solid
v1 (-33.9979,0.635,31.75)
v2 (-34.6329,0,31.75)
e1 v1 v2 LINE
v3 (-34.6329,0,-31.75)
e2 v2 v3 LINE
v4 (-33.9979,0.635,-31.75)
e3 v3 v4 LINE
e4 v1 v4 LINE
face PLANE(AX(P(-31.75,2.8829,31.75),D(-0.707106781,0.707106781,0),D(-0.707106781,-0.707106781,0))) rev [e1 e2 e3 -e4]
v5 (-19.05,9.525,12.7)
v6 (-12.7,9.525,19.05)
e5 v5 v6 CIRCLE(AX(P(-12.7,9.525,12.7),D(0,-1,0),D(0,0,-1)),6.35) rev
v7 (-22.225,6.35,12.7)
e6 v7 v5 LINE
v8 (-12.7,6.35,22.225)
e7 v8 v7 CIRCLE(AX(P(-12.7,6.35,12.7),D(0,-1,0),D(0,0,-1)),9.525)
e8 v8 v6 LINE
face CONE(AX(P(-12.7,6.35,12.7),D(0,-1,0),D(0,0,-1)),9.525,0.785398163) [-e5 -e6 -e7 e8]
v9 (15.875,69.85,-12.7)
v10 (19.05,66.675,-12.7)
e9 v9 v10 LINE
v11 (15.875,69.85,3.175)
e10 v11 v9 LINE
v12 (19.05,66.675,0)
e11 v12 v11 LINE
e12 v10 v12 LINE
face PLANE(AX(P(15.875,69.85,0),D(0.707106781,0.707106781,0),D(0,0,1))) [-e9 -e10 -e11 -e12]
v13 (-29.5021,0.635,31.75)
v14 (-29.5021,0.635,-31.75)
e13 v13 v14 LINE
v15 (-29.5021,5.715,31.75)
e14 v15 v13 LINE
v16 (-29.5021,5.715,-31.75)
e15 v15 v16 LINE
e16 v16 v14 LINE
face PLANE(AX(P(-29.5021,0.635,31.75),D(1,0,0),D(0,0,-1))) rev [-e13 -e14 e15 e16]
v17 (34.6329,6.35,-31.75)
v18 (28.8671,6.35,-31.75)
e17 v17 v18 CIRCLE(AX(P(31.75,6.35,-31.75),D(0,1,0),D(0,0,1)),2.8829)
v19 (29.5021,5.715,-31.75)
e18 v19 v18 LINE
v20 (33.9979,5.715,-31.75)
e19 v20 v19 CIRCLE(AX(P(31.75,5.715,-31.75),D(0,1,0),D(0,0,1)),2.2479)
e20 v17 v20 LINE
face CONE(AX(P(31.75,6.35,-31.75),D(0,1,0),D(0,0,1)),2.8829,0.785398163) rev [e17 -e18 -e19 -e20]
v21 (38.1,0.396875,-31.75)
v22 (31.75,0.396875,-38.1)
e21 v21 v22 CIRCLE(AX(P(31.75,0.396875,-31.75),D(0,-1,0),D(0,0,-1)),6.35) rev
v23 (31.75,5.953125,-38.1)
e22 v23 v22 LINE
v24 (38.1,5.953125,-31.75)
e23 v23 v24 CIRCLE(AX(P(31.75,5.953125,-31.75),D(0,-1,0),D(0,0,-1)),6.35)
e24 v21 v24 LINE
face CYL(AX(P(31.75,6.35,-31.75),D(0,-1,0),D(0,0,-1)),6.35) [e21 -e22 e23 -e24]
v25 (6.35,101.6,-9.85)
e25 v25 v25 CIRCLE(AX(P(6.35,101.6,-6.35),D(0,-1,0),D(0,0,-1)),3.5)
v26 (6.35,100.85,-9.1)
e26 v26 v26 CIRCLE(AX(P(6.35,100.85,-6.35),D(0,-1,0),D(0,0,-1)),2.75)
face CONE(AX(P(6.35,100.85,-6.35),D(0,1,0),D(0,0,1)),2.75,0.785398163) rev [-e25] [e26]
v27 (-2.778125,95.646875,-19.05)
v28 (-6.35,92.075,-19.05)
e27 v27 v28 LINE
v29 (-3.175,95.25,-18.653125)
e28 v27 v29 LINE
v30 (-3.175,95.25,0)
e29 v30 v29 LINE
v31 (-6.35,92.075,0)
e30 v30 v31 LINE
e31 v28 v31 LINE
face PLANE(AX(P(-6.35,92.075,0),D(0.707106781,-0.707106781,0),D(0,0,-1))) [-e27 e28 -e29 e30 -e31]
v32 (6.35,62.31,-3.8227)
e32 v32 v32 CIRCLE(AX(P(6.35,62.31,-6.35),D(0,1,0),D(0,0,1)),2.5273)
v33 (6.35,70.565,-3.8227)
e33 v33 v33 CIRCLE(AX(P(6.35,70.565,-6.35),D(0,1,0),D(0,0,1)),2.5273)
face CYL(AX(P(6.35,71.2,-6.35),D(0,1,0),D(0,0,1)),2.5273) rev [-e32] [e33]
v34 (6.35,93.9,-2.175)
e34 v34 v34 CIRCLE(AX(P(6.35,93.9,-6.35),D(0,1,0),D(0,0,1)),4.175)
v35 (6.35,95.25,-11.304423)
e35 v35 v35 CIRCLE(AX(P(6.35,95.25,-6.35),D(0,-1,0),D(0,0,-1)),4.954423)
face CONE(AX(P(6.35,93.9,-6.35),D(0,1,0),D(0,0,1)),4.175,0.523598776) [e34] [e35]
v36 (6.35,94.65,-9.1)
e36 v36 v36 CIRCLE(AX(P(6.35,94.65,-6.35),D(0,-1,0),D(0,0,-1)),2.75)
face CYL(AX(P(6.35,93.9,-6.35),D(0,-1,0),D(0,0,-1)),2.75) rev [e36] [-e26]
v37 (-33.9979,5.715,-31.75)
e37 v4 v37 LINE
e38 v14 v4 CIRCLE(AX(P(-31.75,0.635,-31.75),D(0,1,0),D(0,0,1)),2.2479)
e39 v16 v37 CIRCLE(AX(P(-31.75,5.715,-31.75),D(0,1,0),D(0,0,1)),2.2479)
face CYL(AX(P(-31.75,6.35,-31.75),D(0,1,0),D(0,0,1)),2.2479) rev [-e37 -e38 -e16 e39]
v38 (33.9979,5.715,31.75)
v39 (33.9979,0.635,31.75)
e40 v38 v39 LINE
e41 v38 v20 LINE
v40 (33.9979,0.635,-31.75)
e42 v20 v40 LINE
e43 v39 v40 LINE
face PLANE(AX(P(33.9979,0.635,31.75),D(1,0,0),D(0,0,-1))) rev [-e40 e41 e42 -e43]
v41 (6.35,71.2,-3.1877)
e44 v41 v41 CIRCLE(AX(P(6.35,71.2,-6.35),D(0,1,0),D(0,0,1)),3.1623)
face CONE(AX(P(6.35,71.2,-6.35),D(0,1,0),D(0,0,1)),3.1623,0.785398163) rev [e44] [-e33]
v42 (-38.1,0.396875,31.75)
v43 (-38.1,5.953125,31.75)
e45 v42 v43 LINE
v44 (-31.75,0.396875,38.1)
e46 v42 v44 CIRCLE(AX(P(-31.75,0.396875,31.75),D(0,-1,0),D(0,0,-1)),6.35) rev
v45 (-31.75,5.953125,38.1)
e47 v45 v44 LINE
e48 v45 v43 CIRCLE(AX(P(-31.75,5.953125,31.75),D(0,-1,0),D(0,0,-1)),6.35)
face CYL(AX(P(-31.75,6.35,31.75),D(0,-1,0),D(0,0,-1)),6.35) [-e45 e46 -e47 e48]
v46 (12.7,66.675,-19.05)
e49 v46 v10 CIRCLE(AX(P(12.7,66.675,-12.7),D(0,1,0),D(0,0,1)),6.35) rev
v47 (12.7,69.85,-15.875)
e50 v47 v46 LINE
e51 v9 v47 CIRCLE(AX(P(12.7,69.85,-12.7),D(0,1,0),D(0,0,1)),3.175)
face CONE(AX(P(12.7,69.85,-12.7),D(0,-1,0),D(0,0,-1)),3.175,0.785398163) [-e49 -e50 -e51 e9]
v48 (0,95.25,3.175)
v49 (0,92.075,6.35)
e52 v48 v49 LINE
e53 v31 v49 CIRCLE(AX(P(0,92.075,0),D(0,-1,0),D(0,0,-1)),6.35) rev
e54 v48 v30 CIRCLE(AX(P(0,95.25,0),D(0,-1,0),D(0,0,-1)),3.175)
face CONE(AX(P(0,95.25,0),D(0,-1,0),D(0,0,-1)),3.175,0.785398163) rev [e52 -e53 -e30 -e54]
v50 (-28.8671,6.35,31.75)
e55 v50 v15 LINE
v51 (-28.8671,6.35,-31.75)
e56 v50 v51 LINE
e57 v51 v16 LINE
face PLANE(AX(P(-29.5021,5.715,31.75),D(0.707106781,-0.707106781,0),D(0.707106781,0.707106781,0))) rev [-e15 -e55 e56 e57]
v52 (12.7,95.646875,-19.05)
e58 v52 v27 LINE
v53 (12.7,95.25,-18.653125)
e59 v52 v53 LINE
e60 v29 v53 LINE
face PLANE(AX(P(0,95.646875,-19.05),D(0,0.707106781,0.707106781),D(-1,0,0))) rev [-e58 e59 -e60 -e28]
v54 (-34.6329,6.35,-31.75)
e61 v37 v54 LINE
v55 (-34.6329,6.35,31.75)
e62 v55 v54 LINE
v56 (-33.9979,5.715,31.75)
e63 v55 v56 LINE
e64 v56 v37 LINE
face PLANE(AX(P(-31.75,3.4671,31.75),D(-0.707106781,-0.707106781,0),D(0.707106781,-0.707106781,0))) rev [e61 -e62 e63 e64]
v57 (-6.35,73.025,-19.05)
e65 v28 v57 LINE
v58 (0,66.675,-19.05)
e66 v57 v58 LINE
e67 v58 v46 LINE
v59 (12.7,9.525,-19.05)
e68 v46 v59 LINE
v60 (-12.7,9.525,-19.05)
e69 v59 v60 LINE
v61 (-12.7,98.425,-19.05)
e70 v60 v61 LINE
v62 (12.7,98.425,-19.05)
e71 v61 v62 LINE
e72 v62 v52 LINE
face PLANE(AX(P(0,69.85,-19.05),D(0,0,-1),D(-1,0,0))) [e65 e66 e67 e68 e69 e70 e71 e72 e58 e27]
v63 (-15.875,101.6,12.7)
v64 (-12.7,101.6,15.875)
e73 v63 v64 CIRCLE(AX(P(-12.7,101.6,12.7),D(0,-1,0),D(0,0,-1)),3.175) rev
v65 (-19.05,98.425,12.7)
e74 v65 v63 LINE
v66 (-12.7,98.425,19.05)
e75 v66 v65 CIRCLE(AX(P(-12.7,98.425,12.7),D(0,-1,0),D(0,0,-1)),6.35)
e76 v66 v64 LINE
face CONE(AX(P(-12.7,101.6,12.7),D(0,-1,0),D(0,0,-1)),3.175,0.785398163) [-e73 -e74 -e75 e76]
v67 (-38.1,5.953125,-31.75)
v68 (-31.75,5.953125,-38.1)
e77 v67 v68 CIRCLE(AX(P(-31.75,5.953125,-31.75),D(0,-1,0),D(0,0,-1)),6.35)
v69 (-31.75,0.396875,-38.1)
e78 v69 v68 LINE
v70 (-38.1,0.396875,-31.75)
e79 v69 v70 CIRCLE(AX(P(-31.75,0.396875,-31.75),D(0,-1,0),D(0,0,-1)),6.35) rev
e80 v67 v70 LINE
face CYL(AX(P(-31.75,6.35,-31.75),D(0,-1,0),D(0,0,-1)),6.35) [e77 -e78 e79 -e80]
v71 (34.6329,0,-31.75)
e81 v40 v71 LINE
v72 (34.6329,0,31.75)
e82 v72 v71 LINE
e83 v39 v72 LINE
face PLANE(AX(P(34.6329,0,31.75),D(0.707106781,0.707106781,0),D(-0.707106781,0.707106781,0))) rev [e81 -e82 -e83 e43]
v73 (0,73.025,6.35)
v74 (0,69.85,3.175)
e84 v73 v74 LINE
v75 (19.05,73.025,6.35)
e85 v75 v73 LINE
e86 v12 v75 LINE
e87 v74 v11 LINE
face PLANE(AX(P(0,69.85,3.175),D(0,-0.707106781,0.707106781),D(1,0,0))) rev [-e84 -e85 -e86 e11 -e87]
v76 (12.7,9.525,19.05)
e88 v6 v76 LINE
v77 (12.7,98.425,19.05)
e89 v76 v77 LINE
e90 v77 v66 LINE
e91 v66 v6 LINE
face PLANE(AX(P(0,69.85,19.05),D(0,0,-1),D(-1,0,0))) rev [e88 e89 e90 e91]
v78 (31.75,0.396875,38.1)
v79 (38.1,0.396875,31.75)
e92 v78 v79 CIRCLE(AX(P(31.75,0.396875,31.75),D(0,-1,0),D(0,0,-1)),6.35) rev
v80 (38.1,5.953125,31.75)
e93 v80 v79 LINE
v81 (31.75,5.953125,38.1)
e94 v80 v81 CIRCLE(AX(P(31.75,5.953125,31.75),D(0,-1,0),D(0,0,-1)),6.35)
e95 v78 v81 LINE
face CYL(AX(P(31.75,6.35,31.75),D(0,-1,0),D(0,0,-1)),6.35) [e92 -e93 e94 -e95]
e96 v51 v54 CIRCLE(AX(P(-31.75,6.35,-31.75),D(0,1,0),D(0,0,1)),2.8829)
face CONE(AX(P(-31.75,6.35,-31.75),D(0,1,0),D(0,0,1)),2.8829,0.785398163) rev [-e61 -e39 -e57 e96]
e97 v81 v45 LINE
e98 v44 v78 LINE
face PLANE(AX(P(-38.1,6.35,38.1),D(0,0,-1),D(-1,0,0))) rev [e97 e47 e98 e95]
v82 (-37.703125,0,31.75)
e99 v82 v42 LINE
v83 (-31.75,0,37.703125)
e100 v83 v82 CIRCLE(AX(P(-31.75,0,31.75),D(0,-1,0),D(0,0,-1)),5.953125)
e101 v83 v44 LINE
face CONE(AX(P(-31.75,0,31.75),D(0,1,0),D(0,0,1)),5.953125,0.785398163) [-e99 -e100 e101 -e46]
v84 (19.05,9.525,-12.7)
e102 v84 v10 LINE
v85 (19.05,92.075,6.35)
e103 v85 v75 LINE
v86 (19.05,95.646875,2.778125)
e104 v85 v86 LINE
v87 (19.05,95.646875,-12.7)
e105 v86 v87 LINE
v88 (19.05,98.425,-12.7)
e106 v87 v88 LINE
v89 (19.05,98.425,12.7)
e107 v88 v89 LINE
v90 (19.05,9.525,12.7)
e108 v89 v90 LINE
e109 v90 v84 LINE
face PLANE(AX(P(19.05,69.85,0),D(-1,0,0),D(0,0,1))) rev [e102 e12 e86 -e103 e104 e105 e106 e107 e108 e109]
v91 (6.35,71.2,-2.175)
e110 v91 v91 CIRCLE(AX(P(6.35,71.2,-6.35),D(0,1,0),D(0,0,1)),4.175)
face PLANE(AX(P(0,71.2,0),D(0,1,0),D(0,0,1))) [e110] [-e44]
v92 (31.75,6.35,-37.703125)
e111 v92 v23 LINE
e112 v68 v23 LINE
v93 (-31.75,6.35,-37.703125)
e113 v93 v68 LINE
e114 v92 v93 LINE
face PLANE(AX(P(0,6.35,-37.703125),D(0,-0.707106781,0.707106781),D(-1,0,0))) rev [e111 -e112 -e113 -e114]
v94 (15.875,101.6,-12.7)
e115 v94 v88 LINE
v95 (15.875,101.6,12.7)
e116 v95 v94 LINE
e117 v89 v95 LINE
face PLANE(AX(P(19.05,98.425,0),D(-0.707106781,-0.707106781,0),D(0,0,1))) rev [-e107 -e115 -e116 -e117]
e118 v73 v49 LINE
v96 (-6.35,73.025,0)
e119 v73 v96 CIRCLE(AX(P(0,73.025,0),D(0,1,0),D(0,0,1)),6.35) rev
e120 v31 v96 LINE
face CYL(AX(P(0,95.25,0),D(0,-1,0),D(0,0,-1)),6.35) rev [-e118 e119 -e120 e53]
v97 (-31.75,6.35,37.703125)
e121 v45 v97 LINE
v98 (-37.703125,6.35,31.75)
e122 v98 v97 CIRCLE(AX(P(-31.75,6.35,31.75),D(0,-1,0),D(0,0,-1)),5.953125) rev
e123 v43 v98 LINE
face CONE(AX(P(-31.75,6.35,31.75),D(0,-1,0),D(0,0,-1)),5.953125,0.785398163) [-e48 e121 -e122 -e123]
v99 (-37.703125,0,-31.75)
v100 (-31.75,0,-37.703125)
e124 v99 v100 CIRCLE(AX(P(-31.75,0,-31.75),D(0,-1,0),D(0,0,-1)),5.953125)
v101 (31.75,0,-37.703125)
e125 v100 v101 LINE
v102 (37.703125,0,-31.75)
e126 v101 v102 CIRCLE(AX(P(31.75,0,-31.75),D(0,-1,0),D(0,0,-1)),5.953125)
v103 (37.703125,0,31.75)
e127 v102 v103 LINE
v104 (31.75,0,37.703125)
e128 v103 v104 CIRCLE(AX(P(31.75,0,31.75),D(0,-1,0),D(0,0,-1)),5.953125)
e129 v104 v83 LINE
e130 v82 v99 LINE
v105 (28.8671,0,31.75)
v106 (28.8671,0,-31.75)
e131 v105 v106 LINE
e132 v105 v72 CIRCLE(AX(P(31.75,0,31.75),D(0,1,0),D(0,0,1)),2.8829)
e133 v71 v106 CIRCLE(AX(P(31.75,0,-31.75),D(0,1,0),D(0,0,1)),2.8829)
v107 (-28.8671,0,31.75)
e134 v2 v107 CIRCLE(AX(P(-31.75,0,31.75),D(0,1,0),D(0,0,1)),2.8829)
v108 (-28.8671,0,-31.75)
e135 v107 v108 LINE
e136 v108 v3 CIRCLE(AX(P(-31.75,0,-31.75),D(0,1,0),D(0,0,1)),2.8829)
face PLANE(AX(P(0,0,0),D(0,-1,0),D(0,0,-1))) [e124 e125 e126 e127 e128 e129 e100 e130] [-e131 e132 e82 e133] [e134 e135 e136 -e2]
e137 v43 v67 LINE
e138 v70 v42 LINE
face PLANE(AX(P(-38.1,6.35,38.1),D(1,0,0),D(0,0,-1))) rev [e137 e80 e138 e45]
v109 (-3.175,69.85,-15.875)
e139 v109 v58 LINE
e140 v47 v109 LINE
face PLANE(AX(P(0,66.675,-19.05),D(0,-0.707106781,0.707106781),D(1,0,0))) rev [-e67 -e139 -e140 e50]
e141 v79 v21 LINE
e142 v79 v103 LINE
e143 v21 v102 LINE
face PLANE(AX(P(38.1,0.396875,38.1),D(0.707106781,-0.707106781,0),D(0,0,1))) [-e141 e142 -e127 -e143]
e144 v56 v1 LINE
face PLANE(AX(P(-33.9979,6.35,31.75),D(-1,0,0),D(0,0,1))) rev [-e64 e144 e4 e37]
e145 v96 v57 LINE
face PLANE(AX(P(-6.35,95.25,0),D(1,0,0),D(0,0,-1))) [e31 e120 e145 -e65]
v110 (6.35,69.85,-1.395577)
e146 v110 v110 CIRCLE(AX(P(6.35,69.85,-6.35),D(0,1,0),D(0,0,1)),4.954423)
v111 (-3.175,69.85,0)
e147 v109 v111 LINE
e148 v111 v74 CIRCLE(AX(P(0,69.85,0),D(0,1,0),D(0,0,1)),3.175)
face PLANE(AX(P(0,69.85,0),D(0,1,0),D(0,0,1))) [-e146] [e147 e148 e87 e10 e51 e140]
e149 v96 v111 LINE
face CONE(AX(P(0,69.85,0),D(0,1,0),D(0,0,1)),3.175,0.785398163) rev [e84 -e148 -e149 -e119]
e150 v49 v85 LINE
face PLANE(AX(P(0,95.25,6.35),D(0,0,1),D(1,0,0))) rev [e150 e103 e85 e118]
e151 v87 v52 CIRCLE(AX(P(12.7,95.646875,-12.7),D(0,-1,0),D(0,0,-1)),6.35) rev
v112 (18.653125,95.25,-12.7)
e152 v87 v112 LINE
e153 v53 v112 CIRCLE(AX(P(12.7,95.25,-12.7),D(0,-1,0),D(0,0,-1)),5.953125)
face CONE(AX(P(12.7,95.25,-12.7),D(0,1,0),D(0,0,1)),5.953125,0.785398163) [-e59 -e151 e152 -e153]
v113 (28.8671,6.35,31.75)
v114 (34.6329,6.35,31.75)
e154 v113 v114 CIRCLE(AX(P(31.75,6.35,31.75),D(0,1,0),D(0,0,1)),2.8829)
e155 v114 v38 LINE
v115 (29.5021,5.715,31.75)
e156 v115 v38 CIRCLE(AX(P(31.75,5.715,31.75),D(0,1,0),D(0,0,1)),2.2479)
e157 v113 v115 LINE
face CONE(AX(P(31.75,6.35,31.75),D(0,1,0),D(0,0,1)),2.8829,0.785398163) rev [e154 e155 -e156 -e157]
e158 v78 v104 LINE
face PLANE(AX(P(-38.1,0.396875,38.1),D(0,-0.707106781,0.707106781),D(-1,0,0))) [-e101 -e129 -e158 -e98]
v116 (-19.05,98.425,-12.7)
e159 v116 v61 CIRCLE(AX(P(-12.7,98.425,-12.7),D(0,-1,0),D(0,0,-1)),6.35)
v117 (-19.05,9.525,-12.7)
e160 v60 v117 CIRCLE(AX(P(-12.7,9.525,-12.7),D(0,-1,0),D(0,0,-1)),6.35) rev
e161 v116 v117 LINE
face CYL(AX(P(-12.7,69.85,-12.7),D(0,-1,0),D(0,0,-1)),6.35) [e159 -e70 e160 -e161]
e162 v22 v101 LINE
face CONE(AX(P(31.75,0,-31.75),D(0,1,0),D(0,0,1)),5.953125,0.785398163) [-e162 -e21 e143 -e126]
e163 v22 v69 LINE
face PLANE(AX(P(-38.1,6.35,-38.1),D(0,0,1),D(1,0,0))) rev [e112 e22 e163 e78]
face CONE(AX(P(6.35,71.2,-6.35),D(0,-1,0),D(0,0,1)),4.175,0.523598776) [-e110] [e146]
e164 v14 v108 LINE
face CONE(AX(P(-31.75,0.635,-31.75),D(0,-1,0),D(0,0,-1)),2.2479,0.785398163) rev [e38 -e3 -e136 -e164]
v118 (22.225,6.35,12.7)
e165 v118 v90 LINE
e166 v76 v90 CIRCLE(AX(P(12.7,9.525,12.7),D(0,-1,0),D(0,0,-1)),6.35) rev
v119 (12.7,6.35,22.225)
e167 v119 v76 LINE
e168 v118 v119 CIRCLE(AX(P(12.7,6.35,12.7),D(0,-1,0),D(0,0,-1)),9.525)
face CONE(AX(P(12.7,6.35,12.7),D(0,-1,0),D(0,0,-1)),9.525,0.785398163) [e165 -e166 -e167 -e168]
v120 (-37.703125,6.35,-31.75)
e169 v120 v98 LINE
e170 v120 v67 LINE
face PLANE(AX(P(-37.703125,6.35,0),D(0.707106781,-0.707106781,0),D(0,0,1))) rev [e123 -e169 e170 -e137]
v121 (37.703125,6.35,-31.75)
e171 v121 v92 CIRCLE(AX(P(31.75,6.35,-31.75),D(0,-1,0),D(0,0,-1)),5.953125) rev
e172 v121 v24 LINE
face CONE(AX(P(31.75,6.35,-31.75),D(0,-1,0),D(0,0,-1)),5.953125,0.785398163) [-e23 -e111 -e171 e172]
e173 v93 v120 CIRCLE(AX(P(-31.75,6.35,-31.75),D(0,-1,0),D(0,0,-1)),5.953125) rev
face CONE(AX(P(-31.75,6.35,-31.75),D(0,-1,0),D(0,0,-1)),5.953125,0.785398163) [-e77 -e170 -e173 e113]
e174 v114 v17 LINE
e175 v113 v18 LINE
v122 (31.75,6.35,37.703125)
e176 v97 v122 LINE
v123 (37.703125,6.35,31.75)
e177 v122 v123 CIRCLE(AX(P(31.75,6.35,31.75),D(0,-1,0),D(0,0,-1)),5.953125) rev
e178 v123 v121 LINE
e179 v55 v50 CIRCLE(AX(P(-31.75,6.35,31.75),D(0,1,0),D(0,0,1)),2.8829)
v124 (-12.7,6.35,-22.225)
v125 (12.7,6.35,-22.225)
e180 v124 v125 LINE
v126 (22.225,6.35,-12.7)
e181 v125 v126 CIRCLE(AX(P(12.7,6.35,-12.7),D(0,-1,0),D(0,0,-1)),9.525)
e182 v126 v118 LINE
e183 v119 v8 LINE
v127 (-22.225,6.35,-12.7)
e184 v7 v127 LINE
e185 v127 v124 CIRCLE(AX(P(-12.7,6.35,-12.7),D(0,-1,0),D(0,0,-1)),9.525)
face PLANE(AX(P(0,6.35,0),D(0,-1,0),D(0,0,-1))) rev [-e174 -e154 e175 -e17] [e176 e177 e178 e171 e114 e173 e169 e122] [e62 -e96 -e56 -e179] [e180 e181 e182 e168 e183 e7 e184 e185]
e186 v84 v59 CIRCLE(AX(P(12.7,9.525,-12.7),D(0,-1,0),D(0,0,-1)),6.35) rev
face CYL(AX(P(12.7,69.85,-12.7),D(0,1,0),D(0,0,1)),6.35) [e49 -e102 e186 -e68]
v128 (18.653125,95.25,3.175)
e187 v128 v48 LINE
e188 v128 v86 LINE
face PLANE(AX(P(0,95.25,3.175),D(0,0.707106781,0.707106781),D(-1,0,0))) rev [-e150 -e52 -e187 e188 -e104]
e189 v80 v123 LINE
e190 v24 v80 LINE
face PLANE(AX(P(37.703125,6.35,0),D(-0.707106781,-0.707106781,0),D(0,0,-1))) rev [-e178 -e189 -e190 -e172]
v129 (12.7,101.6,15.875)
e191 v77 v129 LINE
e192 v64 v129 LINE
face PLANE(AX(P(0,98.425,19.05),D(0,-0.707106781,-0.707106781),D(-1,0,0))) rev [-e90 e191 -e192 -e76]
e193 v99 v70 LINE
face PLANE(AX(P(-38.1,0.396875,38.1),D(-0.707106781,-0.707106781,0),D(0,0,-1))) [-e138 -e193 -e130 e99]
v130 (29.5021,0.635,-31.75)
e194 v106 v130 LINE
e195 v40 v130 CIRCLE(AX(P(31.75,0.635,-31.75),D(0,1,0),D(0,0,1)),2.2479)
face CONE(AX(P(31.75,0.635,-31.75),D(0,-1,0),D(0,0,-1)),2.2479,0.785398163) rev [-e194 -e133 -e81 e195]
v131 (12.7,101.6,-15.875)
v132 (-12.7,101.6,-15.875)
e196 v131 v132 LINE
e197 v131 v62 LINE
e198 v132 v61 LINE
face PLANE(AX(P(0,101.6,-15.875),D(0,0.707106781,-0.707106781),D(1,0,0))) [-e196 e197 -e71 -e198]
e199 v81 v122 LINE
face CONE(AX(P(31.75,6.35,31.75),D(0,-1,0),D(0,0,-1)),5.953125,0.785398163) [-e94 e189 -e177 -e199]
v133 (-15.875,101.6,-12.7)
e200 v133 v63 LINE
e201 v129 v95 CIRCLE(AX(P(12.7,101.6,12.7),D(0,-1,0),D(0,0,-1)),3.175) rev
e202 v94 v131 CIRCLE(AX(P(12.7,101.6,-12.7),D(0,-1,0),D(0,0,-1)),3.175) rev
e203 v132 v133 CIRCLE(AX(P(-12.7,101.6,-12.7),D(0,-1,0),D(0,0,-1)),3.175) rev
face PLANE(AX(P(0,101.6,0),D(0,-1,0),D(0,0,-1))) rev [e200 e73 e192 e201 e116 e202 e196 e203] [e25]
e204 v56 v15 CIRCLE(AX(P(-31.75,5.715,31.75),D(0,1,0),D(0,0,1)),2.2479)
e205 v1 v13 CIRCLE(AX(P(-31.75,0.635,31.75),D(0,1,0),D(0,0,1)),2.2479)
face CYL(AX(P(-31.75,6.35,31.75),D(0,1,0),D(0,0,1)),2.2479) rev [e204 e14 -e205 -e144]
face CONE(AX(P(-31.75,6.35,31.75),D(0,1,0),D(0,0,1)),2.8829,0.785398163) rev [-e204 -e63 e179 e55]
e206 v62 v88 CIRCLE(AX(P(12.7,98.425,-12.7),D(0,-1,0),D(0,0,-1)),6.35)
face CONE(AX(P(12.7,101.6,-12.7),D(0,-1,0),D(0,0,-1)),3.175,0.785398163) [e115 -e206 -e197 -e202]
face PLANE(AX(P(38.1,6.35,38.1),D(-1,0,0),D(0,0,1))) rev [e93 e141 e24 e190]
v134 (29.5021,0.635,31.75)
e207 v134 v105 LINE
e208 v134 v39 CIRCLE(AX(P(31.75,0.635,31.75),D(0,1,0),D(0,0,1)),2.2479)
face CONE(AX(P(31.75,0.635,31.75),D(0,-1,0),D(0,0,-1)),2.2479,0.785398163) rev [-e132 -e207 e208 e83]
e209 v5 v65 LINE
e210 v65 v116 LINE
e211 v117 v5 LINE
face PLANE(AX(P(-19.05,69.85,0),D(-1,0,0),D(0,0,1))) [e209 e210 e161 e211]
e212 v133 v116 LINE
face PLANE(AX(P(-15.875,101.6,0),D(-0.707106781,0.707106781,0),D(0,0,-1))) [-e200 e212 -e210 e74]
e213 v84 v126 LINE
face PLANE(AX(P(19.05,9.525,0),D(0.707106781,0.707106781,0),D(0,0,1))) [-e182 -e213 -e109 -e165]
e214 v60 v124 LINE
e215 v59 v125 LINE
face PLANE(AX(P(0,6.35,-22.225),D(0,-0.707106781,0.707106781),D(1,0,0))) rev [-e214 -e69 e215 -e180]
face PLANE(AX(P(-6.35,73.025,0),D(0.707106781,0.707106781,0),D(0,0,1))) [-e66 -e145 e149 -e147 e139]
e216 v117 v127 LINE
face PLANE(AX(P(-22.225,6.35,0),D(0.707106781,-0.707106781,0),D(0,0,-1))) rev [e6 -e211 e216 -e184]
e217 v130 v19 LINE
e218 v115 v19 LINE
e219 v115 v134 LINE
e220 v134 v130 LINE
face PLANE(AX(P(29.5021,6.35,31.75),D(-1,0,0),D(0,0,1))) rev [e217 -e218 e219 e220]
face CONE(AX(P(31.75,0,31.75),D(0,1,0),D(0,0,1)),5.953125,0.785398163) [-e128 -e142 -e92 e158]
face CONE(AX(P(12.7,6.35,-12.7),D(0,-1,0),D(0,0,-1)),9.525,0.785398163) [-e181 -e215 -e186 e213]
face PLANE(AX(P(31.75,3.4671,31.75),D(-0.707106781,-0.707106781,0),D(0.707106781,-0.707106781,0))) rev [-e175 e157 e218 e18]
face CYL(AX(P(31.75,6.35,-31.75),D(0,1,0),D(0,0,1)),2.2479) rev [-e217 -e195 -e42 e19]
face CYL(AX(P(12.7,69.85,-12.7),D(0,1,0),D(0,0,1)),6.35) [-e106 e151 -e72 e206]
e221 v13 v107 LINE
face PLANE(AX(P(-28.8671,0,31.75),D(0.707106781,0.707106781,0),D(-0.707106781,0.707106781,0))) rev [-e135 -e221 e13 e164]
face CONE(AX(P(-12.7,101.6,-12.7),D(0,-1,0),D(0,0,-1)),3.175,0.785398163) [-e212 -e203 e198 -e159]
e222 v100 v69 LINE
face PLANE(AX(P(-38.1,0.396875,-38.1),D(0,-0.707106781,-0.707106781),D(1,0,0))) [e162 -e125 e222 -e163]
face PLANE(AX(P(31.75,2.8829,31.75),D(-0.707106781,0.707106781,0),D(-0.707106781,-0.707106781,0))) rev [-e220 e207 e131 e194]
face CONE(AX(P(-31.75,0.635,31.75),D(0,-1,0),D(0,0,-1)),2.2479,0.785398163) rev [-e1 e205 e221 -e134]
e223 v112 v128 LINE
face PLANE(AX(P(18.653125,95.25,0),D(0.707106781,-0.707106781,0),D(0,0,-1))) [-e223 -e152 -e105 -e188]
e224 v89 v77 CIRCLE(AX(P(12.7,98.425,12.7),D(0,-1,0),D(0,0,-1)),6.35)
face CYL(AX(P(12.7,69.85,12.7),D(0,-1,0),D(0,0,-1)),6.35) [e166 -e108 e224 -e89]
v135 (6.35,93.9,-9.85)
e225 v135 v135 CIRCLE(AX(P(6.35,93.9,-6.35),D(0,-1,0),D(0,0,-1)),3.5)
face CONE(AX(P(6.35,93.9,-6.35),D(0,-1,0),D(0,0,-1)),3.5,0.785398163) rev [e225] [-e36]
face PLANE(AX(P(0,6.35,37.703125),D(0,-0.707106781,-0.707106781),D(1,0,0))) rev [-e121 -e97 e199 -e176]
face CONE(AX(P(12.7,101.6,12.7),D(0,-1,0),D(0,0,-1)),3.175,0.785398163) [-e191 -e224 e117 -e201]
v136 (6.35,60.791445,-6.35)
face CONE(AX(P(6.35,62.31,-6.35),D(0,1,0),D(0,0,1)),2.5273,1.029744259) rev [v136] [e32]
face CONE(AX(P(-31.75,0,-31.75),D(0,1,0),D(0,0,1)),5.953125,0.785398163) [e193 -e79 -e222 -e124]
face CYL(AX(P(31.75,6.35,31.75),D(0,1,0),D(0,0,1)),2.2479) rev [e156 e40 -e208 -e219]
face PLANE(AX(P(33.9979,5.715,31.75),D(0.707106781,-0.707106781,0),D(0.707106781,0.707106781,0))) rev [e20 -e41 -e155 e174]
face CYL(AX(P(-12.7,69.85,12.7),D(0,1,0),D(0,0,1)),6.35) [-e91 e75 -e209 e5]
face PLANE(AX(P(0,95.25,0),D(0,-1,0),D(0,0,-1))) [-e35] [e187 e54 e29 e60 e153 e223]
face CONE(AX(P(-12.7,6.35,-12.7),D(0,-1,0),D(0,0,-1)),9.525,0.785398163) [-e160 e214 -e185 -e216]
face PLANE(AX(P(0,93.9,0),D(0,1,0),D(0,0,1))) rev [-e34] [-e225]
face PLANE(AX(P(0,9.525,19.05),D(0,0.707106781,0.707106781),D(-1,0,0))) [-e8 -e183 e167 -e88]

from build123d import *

# Parameters (mm, degrees)
SKETCH1_W                            = 76.2
SKETCH1_H                            = 76.2
BOSS_EXTRUDE1_DEPTH                  = 6.35
SKETCH2_W                            = 38.1
SKETCH2_H                            = 38.1
BOSS_EXTRUDE2_DEPTH                  = 69.85
BOSS_EXTRUDE3_DEPTH                  = 95.25
BOSS_EXTRUDE4_START                  = 95.25
SKETCH2_5_W                          = 25.4
SKETCH2_5_H                          = 25.4
SKETCH2_5_R                          = 4.175
BOSS_EXTRUDE4_DEPTH                  = 6.35
BOSS_EXTRUDE6_START                  = 93.9
SKETCH2_7_R                          = 4.175
BOSS_EXTRUDE6_DEPTH                  = 1.35
BOSS_EXTRUDE6_DRAFT                  = -30
F_8_0_199_DIAMETER_HOLE1_D           = 5.0546
F_8_0_199_DIAMETER_HOLE1_DEPTH       = 8.89
F_8_0_199_DIAMETER_HOLE1_CSINK_D     = 6.3246
F_8_0_199_DIAMETER_HOLE1_CSINK_ANGLE = 90
F_8_0_199_DIAMETER_HOLE1_TIP         = 1.518555042
F_8_START                            = -31.75
F_8_CLEARANCE_SLOT1_DEPTH            = 63.5
FILLET2_R                            = 6.35
CHAMFER2_SIZE                        = 3.175
CHAMFER3_SIZE                        = 3.175
CHAMFER4_SIZE                        = 0.396875


with BuildPart() as part:
    # Sketch1 → Boss-Extrude1 (new body)
    with BuildSketch(Plane(origin=(0, 0, 0), x_dir=(1, 0, 0), z_dir=(0, 1, 0))):
        Rectangle(SKETCH1_W, SKETCH1_H)
    extrude(amount=BOSS_EXTRUDE1_DEPTH)

    # Sketch2 → Boss-Extrude2 (add)
    with BuildSketch(Plane(origin=(0, 0, 0), x_dir=(1, 0, 0), z_dir=(0, 1, 0))):
        Rectangle(SKETCH2_W, SKETCH2_H)
    extrude(amount=BOSS_EXTRUDE2_DEPTH)

    # Sketch2<3> → Boss-Extrude3 (add)
    with BuildSketch(Plane(origin=(0, 0, 0), x_dir=(1, 0, 0), z_dir=(0, 1, 0))):
        Polygon((-19.05, 19.05), (-19.05, -19.05), (19.05, -19.05), (19.05, -6.35), (-6.35, -6.35), (-6.35, 19.05), align=None)
    extrude(amount=BOSS_EXTRUDE3_DEPTH)

    # Sketch2<5> → Boss-Extrude4 (add)
    # profile 1 of 3: a face of its own
    with BuildSketch(Plane(origin=(0, 0, 0), x_dir=(1, 0, 0), z_dir=(0, 1, 0)).offset(BOSS_EXTRUDE4_START)):
        Polygon((-19.05, 19.05), (-19.05, -19.05), (19.05, -19.05), (19.05, -6.35), (-6.35, -6.35), (-6.35, 19.05), align=None)
    # profile 2 of 3: a face of its own
    with BuildSketch(Plane(origin=(0, 0, 0), x_dir=(1, 0, 0), z_dir=(0, 1, 0)).offset(BOSS_EXTRUDE4_START)):
        with Locations((6.35, 6.35)):
            Rectangle(SKETCH2_5_W, SKETCH2_5_H)
        with Locations((6.35, 6.35)):
            Circle(SKETCH2_5_R, mode=Mode.SUBTRACT)
    # profile 3 of 3: a face of its own
    with BuildSketch(Plane(origin=(0, 0, 0), x_dir=(1, 0, 0), z_dir=(0, 1, 0)).offset(BOSS_EXTRUDE4_START)):
        with Locations((6.35, 6.35)):
            Circle(SKETCH2_5_R)
    extrude(amount=BOSS_EXTRUDE4_DEPTH)

    # Boss-Extrude5: read off the stored shape, not the designer's step
    # Boss-Extrude5 outline → Boss-Extrude5 (revolve)
    with BuildSketch(Plane(origin=(6.35, 0, -6.35), x_dir=(1, 0, 0), z_dir=(0, 0, 1))):
        Polygon((4.175, 71.2), (0, 71.2), (0, 69.85), (4.954422863, 69.85), align=None)
    revolve(axis=Axis((6.35, 0, -6.35), (0, 1, 0)))


with BuildPart() as boss_extrude6_tool:
    # Sketch2<7> → Boss-Extrude6 (with draft: the straight prism first)
    with BuildSketch(Plane(origin=(0, 0, 0), x_dir=(1, 0, 0), z_dir=(0, 1, 0)).offset(BOSS_EXTRUDE6_START)):
        with Locations((6.35, 6.35)):
            Circle(SKETCH2_7_R)
    extrude(amount=BOSS_EXTRUDE6_DEPTH)
    # Boss-Extrude6: the draft: its side faces are tilted about the plane it starts from
    boss_extrude6_sides = [boss_extrude6_tool.faces().sort_by_distance(p)[0] for p in [
        (2.175, 94.575, -6.35),
    ]]
    draft(boss_extrude6_sides, Plane(origin=(0, 0, 0), x_dir=(1, 0, 0), z_dir=(0, 1, 0)).offset(BOSS_EXTRUDE6_START), BOSS_EXTRUDE6_DRAFT)


with BuildPart() as part_1:
    add(part.part)

    # Boss-Extrude6: add boss_extrude6_tool
    add(boss_extrude6_tool.part)

    # #8 (0.199) Diameter Hole1
    with Locations(Plane(origin=(0, 71.2, 0), x_dir=(1, 0, 0), z_dir=(0, 1, 0))):
        with Locations((6.35, 6.35)):
            CounterSinkHole(F_8_0_199_DIAMETER_HOLE1_D / 2, F_8_0_199_DIAMETER_HOLE1_CSINK_D / 2, depth=F_8_0_199_DIAMETER_HOLE1_DEPTH, counter_sink_angle=F_8_0_199_DIAMETER_HOLE1_CSINK_ANGLE)
            with Locations((0, 0, -(F_8_0_199_DIAMETER_HOLE1_DEPTH + F_8_0_199_DIAMETER_HOLE1_TIP / 2))):  # 118° drill point
                Cone(0, F_8_0_199_DIAMETER_HOLE1_D / 2, F_8_0_199_DIAMETER_HOLE1_TIP, mode=Mode.SUBTRACT)

    # Sketch8 → M5 Clearance Hole1 (revolve, cut)
    with BuildSketch(Plane(origin=(6.35, 93.9, -6.35), x_dir=(0, 0, -1), z_dir=(1, 0, 0))):
        Polygon((0, 0), (0, 7.7), (3.5, 7.7), (2.75, 6.95), (2.75, 0.75), (3.5, 0), align=None)
    revolve(axis=Axis((6.35, 87.55, -6.35), (0, 1, 0)), mode=Mode.SUBTRACT)

    # #8 Clearance Slot1: read off the stored shape, not the designer's step
    # #8 Clearance Slot1 outline → #8 Clearance Slot1 (cut)
    with BuildSketch(Plane.XY.offset(F_8_START)):
        Polygon((34.6329, 6.35), (28.8671, 6.35), (29.5021, 5.715), (29.5021, 0.635), (28.8671, 0), (34.6329, 0), (33.9979, 0.635), (33.9979, 5.715), align=None)
        Polygon((-29.5021, 5.715), (-28.8671, 6.35), (-34.6329, 6.35), (-33.9979, 5.715), (-33.9979, 0.635), (-34.6329, 0), (-28.8671, 0), (-29.5021, 0.635), align=None)
    extrude(amount=F_8_CLEARANCE_SLOT1_DEPTH, mode=Mode.SUBTRACT)

    # 8 Clearance Slot1 2 outline → 8 Clearance Slot1 2 (revolve, cut)
    with BuildSketch(Plane(origin=(31.75, 0, -31.75), x_dir=(1, 0, 0), z_dir=(0, 0, 1))):
        Polygon((0, 0), (2.8829, 0), (2.2479, 0.635), (2.2479, 5.715), (2.8829, 6.35), (0, 6.35), align=None)
    revolve(axis=Axis((31.75, 0, -31.75), (0, 1, 0)), mode=Mode.SUBTRACT)

    # 8 Clearance Slot1 3 outline → 8 Clearance Slot1 3 (revolve, cut)
    with BuildSketch(Plane(origin=(31.75, 0, 31.75), x_dir=(1, 0, 0), z_dir=(0, 0, 1))):
        Polygon((0, 0), (2.8829, 0), (2.2479, 0.635), (2.2479, 5.715), (2.8829, 6.35), (0, 6.35), align=None)
    revolve(axis=Axis((31.75, 0, 31.75), (0, 1, 0)), mode=Mode.SUBTRACT)

    # 8 Clearance Slot1 4 outline → 8 Clearance Slot1 4 (revolve, cut)
    with BuildSketch(Plane(origin=(-31.75, 0, -31.75), x_dir=(1, 0, 0), z_dir=(0, 0, 1))):
        Polygon((0, 0), (2.8829, 0), (2.2479, 0.635), (2.2479, 5.715), (2.8829, 6.35), (0, 6.35), align=None)
    revolve(axis=Axis((-31.75, 0, -31.75), (0, 1, 0)), mode=Mode.SUBTRACT)

    # 8 Clearance Slot1 5 outline → 8 Clearance Slot1 5 (revolve, cut)
    with BuildSketch(Plane(origin=(-31.75, 0, 31.75), x_dir=(1, 0, 0), z_dir=(0, 0, 1))):
        Polygon((0, 0), (2.8829, 0), (2.2479, 0.635), (2.2479, 5.715), (2.8829, 6.35), (0, 6.35), align=None)
    revolve(axis=Axis((-31.75, 0, 31.75), (0, 1, 0)), mode=Mode.SUBTRACT)

    # Fillet2
    fillet2_edges = [part_1.edges().sort_by_distance(p)[0] for p in [
        (19.05, 38.1, -19.05),
        (-19.05, 53.975, -19.05),
        (-19.05, 53.975, 19.05),
        (19.05, 53.975, 19.05),
        (-6.35, 82.55, 6.35),
        (19.05, 98.425, -19.05),
        (38.1, 3.175, 38.1),
        (-38.1, 3.175, 38.1),
        (-38.1, 3.175, -38.1),
        (38.1, 3.175, -38.1),
    ]]
    fillet(fillet2_edges, radius=FILLET2_R)

    # Chamfer2
    chamfer2_edges = [part_1.edges().sort_by_distance(p)[0] for p in [
        (-6.35, 69.85, -9.525),
        (9.525, 69.85, 6.35),
        (-4.490128061, 69.85, 4.490128061),
        (-4.490128061, 95.25, 4.490128061),
        (-19.05, 6.35, 0),
        (0, 6.35, -19.05),
        (19.05, 6.35, 0),
        (0, 6.35, 19.05),
        (-17.190128061, 6.35, -17.190128061),
        (17.190128061, 6.35, -17.190128061),
        (-17.190128061, 6.35, 17.190128061),
        (17.190128061, 6.35, 17.190128061),
        (-6.35, 95.25, -9.525),
        (9.525, 95.25, 6.35),
    ]]
    chamfer(chamfer2_edges, length=CHAMFER2_SIZE)

    # Chamfer3
    chamfer3_edges = [part_1.edges().sort_by_distance(p)[0] for p in [
        (17.190128061, 69.85, -17.190128061),
        (0, 101.6, -19.05),
        (19.05, 101.6, 0),
        (-19.05, 101.6, 0),
        (0, 101.6, 19.05),
        (17.190128061, 101.6, 17.190128061),
        (-17.190128061, 101.6, 17.190128061),
        (-17.190128061, 101.6, -17.190128061),
        (17.190128061, 101.6, -17.190128061),
        (19.05, 69.85, -4.7625),
        (4.7625, 69.85, -19.05),
    ]]
    chamfer(chamfer3_edges, length=CHAMFER3_SIZE)

    # Chamfer4
    chamfer4_edges = [part_1.edges().sort_by_distance(p)[0] for p in [
        (4.7625, 95.25, -19.05),
        (19.05, 95.25, -4.7625),
        (17.190128061, 95.25, -17.190128061),
        (-38.1, 0, 0),
        (-38.1, 6.35, 0),
        (38.1, 0, 0),
        (0, 0, 38.1),
        (0, 0, -38.1),
        (36.240128061, 0, -36.240128061),
        (36.240128061, 0, 36.240128061),
        (-36.240128061, 0, 36.240128061),
        (-36.240128061, 0, -36.240128061),
        (0, 6.35, -38.1),
        (38.1, 6.35, 0),
        (0, 6.35, 38.1),
        (36.240128061, 6.35, -36.240128061),
        (36.240128061, 6.35, 36.240128061),
        (-36.240128061, 6.35, 36.240128061),
        (-36.240128061, 6.35, -36.240128061),
    ]]
    chamfer(chamfer4_edges, length=CHAMFER4_SIZE)


solid = part_1.part
